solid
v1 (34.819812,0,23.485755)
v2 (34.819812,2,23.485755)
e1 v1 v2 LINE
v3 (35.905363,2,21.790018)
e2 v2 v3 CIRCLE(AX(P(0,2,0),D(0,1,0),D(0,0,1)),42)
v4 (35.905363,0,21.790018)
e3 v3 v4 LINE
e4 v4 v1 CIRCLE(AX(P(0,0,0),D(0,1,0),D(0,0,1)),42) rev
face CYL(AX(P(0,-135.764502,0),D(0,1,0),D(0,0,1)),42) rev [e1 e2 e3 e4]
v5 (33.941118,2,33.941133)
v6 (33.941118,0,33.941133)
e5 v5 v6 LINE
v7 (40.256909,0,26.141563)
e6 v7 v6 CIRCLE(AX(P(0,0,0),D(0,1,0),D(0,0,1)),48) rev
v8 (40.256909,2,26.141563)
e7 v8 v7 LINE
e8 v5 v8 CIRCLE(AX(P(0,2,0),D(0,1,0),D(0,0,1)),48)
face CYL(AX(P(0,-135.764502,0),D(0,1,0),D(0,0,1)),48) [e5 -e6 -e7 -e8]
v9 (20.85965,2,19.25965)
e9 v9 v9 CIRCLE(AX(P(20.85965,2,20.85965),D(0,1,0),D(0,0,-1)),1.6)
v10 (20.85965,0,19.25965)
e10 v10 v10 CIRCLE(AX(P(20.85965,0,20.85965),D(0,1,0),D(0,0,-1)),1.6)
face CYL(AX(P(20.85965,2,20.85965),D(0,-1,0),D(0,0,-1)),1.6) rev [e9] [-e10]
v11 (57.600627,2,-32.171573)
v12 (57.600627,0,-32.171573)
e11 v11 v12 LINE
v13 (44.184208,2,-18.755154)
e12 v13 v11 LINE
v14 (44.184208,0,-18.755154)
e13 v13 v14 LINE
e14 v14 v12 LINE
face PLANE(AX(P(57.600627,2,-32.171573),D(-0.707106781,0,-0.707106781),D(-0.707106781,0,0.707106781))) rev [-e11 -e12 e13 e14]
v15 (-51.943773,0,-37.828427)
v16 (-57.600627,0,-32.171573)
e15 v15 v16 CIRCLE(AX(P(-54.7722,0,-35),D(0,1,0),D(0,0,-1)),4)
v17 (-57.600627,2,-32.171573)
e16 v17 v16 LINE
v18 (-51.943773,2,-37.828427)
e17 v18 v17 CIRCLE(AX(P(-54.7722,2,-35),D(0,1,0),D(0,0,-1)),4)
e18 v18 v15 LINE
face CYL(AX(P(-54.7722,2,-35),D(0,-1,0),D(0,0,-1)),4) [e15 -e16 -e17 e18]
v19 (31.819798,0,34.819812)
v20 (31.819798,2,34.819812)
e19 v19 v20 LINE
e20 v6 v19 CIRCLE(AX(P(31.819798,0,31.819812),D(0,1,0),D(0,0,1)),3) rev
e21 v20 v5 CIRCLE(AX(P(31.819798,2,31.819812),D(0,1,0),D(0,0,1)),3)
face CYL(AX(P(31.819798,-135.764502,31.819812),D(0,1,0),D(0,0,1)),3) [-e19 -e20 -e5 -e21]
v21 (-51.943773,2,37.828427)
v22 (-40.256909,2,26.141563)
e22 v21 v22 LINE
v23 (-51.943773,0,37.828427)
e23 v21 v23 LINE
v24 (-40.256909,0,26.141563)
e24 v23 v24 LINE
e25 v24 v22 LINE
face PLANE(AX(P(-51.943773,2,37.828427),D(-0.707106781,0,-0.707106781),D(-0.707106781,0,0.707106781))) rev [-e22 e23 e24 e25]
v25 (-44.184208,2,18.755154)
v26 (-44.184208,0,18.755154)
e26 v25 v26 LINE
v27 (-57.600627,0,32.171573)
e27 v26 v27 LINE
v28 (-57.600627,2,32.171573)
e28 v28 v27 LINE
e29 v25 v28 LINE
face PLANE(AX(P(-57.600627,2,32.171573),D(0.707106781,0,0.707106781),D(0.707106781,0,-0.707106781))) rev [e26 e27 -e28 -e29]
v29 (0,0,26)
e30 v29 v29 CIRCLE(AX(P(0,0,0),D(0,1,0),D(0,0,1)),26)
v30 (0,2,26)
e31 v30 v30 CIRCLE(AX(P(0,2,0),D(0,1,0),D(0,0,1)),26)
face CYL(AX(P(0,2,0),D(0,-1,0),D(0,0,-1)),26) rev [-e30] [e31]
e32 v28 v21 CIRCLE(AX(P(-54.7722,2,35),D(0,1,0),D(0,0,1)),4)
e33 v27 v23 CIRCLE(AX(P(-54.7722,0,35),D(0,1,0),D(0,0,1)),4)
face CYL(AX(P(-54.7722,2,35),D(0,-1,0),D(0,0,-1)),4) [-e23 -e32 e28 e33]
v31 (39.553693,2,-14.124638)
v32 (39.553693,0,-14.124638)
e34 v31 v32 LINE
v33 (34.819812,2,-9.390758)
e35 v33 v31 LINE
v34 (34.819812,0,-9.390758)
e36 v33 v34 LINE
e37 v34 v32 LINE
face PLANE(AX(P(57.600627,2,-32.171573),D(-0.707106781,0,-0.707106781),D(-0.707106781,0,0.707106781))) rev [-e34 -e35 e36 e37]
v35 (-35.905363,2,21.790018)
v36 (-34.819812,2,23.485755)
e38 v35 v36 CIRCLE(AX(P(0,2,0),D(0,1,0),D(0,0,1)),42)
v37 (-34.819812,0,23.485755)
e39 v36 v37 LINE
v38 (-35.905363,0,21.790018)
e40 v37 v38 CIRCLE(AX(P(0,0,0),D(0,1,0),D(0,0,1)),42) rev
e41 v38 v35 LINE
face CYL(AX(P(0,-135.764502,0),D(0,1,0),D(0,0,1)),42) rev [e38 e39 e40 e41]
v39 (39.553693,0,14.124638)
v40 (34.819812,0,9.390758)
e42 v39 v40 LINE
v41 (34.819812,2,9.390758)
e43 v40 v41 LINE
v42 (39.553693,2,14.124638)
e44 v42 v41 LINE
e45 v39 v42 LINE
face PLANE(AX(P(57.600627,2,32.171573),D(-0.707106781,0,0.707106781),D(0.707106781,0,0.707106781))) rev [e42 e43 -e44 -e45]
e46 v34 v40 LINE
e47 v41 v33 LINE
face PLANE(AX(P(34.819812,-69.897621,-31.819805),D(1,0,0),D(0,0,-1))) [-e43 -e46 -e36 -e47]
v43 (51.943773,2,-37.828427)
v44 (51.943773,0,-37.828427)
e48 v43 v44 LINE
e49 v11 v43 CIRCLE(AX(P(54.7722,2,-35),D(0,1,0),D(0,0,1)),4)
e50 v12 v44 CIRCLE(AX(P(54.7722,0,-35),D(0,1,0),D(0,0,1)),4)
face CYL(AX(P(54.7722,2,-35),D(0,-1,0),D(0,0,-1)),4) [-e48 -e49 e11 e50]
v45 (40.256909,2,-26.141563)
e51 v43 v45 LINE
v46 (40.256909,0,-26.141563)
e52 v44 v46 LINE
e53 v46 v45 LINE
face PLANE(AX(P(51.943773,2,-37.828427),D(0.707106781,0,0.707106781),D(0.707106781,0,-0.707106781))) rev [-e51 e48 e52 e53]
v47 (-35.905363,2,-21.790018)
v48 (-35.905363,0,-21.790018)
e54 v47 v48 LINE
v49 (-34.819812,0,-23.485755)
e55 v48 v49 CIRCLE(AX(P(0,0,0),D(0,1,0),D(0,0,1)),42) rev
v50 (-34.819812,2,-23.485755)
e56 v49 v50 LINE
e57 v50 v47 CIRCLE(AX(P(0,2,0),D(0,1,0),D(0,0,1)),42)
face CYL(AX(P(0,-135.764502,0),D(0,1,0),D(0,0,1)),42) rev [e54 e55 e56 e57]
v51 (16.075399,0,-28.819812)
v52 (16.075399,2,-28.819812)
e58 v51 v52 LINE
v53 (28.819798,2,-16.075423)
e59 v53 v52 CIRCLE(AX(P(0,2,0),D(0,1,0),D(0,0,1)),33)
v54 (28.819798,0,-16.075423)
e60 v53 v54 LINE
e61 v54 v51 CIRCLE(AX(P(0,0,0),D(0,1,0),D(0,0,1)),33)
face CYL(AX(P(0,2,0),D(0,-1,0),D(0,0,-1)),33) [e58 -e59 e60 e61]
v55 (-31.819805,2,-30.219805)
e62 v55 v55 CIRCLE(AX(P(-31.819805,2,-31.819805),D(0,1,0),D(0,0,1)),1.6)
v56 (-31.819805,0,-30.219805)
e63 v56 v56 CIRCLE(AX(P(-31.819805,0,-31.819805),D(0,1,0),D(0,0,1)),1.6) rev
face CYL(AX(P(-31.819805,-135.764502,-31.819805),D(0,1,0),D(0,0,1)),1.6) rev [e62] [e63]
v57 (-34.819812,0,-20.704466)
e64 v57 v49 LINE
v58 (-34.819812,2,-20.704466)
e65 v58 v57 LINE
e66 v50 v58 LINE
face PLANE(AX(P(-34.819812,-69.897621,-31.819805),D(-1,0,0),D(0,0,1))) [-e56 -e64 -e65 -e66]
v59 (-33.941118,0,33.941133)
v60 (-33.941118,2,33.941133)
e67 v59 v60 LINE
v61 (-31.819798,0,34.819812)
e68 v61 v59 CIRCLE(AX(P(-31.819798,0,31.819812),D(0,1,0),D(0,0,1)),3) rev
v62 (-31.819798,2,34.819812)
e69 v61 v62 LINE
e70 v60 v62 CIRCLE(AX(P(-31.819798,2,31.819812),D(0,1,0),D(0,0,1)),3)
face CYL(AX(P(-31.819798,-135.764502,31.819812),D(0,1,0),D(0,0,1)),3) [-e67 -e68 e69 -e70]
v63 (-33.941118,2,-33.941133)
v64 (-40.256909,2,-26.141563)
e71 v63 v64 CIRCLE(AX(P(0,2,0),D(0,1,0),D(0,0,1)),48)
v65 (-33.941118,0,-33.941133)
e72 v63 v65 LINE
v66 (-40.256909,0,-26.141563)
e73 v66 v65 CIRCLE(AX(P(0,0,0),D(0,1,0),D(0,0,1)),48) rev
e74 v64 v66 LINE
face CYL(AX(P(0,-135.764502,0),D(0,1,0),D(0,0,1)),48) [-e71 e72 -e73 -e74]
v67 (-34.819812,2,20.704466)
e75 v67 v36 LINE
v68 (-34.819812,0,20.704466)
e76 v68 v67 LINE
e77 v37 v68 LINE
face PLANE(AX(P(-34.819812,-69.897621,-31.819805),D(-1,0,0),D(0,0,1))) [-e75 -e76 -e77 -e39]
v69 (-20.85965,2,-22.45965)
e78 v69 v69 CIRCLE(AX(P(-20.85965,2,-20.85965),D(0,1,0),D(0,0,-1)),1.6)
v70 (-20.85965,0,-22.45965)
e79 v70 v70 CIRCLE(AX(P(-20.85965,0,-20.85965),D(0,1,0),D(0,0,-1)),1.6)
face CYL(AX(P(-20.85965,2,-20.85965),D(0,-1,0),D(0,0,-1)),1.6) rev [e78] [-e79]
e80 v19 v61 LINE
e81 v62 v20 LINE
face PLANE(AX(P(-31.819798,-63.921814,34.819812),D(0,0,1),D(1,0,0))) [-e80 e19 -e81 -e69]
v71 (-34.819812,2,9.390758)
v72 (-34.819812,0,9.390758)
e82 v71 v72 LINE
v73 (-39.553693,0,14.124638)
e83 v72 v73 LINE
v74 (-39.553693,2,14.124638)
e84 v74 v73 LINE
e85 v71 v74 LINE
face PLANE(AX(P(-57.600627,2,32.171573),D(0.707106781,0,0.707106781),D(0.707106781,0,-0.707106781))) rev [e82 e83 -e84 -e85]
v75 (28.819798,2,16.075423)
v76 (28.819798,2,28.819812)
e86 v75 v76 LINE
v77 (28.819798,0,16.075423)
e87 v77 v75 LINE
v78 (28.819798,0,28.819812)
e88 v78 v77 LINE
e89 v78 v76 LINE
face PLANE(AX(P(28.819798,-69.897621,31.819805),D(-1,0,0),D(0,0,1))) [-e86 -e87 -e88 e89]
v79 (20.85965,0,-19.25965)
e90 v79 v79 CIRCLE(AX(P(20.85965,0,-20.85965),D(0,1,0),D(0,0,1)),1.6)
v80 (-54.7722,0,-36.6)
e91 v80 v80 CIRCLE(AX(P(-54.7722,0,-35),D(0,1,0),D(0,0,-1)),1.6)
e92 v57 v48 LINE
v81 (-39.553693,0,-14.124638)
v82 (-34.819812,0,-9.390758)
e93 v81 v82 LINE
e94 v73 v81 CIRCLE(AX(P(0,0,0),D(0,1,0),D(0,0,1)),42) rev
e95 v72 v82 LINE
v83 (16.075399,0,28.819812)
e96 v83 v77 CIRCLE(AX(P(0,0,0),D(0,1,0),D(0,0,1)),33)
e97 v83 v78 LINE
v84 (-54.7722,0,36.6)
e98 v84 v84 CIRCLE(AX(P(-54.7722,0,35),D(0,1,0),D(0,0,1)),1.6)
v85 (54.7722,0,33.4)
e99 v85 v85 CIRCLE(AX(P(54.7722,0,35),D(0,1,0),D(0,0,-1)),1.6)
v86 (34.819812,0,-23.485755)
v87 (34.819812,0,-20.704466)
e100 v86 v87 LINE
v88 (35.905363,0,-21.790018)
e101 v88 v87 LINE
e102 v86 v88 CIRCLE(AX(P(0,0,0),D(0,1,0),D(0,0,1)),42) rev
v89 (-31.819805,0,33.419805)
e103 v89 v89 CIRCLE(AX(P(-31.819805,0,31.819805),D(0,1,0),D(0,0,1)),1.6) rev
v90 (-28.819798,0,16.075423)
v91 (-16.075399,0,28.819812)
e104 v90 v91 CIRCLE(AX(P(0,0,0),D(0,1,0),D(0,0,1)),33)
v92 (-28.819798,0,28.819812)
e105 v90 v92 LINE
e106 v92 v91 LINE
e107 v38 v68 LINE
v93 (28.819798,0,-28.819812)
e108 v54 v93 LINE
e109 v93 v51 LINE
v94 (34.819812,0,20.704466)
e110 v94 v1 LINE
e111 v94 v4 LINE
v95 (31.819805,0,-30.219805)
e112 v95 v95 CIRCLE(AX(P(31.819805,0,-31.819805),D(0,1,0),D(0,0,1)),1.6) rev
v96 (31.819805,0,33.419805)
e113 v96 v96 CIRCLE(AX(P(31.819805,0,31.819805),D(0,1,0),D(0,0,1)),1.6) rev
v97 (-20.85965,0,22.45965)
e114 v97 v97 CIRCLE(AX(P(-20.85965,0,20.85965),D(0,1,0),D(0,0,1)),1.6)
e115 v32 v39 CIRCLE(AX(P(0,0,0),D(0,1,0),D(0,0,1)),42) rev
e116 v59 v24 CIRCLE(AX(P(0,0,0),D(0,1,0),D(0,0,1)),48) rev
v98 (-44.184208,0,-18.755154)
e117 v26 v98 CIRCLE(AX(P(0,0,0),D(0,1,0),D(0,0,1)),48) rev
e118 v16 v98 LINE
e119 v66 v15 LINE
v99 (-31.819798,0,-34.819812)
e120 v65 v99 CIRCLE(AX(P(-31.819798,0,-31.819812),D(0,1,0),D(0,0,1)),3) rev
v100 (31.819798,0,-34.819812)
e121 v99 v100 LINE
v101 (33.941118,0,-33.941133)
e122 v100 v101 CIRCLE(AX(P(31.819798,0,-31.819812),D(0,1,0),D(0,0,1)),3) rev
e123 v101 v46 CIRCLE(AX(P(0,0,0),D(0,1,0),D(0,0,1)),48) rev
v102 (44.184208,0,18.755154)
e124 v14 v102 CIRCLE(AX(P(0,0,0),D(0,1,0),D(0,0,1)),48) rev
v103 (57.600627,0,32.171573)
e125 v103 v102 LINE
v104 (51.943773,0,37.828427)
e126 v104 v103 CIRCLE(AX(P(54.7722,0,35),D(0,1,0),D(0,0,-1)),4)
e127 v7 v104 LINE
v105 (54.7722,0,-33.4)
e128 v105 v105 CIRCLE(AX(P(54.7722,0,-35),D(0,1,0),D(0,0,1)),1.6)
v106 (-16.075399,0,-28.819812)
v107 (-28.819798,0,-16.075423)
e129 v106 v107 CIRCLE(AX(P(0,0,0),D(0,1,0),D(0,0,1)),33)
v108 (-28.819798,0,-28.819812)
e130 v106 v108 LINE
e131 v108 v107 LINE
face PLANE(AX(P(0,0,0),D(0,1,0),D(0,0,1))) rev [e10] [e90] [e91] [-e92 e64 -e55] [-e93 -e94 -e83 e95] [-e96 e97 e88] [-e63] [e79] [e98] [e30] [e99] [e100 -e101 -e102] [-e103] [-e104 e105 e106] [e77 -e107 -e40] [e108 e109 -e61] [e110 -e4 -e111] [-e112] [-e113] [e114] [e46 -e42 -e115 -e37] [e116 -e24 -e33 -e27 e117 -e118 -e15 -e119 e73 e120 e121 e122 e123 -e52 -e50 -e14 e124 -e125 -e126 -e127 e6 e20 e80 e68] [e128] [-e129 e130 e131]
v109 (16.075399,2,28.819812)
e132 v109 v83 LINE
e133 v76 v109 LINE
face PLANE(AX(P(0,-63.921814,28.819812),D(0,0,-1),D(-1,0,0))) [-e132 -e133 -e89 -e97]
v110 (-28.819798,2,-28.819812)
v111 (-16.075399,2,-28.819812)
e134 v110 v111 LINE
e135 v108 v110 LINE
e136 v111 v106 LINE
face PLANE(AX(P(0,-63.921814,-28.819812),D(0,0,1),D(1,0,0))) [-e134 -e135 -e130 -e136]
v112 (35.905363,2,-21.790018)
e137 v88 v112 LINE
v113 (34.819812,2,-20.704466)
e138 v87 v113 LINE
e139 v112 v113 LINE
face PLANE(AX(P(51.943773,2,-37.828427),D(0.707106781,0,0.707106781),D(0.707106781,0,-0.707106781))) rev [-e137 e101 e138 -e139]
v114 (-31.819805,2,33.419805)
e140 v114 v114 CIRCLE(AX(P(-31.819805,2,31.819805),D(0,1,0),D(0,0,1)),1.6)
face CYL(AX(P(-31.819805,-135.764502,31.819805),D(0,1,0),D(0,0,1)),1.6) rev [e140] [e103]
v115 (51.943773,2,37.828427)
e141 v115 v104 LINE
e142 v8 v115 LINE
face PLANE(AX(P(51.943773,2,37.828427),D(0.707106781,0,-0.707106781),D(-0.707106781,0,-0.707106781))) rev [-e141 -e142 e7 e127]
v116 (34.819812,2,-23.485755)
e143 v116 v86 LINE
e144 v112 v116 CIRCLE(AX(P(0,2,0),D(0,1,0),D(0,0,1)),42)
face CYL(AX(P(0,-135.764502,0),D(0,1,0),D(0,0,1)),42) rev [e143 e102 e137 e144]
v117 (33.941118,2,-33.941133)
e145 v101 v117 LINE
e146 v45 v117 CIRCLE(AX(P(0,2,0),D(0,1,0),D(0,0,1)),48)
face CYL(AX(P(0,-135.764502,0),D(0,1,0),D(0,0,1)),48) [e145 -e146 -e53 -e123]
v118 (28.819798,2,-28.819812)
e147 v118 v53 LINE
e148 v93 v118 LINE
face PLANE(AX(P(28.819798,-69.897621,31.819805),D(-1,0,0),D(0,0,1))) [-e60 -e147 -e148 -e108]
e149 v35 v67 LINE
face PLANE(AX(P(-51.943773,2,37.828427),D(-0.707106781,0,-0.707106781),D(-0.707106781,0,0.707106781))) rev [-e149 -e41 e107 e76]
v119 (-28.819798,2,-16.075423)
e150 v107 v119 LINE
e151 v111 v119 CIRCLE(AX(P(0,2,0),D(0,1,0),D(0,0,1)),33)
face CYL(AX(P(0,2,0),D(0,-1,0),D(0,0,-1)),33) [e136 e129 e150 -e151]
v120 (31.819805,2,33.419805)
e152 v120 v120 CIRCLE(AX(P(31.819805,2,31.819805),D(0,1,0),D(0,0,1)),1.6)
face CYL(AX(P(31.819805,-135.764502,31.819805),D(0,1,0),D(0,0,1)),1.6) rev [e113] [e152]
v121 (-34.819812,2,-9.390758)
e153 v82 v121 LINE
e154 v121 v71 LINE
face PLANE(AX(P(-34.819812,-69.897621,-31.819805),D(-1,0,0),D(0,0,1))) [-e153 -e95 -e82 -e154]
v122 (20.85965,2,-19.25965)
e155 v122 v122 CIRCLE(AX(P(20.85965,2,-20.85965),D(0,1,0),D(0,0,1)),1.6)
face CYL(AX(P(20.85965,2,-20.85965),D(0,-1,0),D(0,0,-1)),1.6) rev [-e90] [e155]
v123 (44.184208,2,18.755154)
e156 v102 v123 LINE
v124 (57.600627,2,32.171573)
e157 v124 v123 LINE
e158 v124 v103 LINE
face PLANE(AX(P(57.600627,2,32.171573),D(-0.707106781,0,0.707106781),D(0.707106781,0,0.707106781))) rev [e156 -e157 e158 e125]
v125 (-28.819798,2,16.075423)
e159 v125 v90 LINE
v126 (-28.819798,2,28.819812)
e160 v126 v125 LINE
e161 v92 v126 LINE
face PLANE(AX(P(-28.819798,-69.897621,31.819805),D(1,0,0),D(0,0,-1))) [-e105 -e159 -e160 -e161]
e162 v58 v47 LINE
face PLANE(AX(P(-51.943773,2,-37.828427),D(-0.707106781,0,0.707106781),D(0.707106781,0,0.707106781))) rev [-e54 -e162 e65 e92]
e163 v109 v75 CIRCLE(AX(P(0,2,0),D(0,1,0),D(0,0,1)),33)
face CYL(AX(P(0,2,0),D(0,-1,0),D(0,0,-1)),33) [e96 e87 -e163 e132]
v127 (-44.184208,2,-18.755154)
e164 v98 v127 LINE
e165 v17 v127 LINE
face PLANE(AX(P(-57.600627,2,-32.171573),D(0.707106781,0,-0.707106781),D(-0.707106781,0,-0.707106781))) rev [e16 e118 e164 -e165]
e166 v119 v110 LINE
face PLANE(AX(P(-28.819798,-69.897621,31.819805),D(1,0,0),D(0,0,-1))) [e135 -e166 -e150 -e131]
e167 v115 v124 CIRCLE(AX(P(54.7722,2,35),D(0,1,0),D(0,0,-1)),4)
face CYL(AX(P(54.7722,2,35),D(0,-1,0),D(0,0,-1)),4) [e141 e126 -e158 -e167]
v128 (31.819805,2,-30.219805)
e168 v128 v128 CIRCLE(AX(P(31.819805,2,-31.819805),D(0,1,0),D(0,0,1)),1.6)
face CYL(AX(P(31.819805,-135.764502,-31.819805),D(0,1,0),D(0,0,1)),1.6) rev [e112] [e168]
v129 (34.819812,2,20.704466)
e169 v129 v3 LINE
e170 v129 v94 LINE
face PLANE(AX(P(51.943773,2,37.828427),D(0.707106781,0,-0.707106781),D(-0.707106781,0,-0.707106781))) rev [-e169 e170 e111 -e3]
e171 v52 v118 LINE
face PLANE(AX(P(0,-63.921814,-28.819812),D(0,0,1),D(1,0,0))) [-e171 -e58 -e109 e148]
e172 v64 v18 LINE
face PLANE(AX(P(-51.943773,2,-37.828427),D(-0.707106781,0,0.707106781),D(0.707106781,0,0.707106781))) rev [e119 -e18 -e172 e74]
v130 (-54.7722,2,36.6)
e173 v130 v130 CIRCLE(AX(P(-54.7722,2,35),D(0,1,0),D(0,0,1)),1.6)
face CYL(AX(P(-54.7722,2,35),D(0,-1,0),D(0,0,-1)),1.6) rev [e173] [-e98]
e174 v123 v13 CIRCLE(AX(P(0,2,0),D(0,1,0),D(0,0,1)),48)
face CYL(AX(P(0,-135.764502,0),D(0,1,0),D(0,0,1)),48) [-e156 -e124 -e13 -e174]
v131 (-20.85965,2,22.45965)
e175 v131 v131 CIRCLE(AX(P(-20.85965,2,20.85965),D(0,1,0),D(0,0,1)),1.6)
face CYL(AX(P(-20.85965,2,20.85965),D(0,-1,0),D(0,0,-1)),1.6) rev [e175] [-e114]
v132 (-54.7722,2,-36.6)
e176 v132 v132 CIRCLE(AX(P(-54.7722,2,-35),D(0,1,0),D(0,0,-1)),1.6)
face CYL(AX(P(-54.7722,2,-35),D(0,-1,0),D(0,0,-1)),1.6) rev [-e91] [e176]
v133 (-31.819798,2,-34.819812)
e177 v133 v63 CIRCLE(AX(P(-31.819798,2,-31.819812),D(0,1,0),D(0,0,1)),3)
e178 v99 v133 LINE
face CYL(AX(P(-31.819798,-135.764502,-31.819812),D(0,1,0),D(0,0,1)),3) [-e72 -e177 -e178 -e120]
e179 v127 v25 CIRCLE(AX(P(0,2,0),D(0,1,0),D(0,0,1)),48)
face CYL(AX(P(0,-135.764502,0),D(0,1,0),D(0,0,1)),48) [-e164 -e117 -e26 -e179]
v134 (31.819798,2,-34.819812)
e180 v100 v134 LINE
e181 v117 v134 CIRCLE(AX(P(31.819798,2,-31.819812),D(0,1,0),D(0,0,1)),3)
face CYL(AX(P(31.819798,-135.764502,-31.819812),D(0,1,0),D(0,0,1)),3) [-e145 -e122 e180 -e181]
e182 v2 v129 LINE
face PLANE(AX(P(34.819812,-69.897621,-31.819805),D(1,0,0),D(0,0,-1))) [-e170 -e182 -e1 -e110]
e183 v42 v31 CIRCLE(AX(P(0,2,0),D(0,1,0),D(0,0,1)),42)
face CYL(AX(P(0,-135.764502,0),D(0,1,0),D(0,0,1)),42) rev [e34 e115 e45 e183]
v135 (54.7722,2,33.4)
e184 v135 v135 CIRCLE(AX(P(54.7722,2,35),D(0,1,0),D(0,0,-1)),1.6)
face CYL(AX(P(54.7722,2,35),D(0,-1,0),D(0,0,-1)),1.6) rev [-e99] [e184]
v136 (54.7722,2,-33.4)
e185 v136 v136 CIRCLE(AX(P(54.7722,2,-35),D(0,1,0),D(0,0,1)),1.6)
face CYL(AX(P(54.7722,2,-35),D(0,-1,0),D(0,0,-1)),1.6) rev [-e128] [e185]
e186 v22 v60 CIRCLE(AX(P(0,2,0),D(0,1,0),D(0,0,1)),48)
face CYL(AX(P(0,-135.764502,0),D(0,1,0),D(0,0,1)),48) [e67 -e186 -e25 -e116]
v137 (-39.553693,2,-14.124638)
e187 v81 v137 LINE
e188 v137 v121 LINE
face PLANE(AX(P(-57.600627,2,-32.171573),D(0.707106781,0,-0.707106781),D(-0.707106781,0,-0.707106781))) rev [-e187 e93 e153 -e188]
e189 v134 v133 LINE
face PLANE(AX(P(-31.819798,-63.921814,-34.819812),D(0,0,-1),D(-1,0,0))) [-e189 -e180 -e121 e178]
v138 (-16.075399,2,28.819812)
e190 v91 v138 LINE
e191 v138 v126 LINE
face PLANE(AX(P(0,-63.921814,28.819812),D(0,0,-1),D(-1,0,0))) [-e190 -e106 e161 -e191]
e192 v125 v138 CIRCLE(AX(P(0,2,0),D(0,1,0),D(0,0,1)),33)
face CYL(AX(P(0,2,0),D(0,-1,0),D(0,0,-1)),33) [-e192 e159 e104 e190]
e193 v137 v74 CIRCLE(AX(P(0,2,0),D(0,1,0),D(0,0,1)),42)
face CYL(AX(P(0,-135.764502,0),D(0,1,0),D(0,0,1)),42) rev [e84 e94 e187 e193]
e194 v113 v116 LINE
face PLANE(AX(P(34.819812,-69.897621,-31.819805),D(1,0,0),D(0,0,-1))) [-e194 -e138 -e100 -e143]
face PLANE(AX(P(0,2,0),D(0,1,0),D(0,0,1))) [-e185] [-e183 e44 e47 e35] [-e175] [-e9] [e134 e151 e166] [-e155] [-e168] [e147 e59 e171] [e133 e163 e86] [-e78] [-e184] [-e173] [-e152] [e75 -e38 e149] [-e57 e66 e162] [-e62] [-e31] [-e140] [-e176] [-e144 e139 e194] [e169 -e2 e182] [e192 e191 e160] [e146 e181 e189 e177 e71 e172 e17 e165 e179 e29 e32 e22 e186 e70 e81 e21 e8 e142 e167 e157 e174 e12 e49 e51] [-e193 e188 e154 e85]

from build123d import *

# Parameters (mm, degrees)
SKETCH1_R           = 1.6
BOSS_EXTRUDE1_DEPTH = 2
SKETCH2_R           = 48
SKETCH2_R_2         = 42
SKETCH2_R_3         = 1.6
BOSS_EXTRUDE2_DEPTH = 2
SKETCH3_R           = 1.6
BOSS_EXTRUDE3_DEPTH = 2
CUT_EXTRUDE1_DEPTH  = 10
FILLET1_R           = 3
BOSS_EXTRUDE4_DEPTH = 2
CUT_EXTRUDE2_START  = -10
SKETCH6_R           = 26
CUT_EXTRUDE2_DEPTH  = 10


with BuildPart() as part:
    # Sketch1 → Boss-Extrude1 (new body)
    with BuildSketch(Plane(origin=(0, 0, 0), x_dir=(1, 0, 0), z_dir=(0, 1, 0))):
        with BuildLine():
            Line((-51.943772875, 37.828427125), (-29.299283734, 15.183937983))
            ThreePointArc((-29.299283734, 15.183937983), (0, 33), (29.299283734, 15.183937983))
            Line((29.299283734, 15.183937983), (51.943772875, 37.828427125))
            ThreePointArc((51.943772875, 37.828427125), (57.600627125, 37.828427125), (57.600627125, 32.171572875))
            Line((57.600627125, 32.171572875), (32.280845123, 6.851790873))
            ThreePointArc((32.280845123, 6.851790873), (33, 0), (32.280845123, -6.851790873))
            Line((32.280845123, -6.851790873), (57.600627125, -32.171572875))
            ThreePointArc((57.600627125, -32.171572875), (57.600627125, -37.828427125), (51.943772875, -37.828427125))
            Line((51.943772875, -37.828427125), (29.299283734, -15.183937983))
            ThreePointArc((29.299283734, -15.183937983), (0, -33), (-29.299283734, -15.183937983))
            Line((-29.299283734, -15.183937983), (-51.943772875, -37.828427125))
            ThreePointArc((-51.943772875, -37.828427125), (-57.600627125, -37.828427125), (-57.600627125, -32.171572875))
            Line((-57.600627125, -32.171572875), (-32.280845123, -6.851790873))
            ThreePointArc((-32.280845123, -6.851790873), (-33, 0), (-32.280845123, 6.851790873))
            Line((-32.280845123, 6.851790873), (-57.600627125, 32.171572875))
            ThreePointArc((-57.600627125, 32.171572875), (-57.600627125, 37.828427125), (-51.943772875, 37.828427125))
        make_face()
        with Locations(Location((54.7722, 35, 0), (0, 0, 270))):
            Circle(SKETCH1_R, mode=Mode.SUBTRACT)
        with Locations(Location((-54.7722, 35, 0), (0, 0, 90))):
            Circle(SKETCH1_R, mode=Mode.SUBTRACT)
        with Locations(Location((54.7722, -35, 0), (0, 0, 90))):
            Circle(SKETCH1_R, mode=Mode.SUBTRACT)
        with Locations(Location((-54.7722, -35, 0), (0, 0, 270))):
            Circle(SKETCH1_R, mode=Mode.SUBTRACT)
        with Locations(Location((20.859650045, 20.859650045, 0), (0, 0, 270))):
            Circle(SKETCH1_R, mode=Mode.SUBTRACT)
        with Locations(Location((-20.859650045, 20.859650045, 0), (0, 0, 90))):
            Circle(SKETCH1_R, mode=Mode.SUBTRACT)
        with Locations(Location((20.859650045, -20.859650045, 0), (0, 0, 90))):
            Circle(SKETCH1_R, mode=Mode.SUBTRACT)
        with Locations(Location((-20.859650045, -20.859650045, 0), (0, 0, 270))):
            Circle(SKETCH1_R, mode=Mode.SUBTRACT)
        with BuildLine():
            Line((0, 4.242640687), (-16.140662024, 20.383302711))
            ThreePointArc((-16.140662024, 20.383302711), (0, 26), (16.140662024, 20.383302711))
            Line((16.140662024, 20.383302711), (0, 4.242640687))
        make_face(mode=Mode.SUBTRACT)
        with BuildLine():
            Line((0, -4.242640687), (-16.140662024, -20.383302711))
            ThreePointArc((-16.140662024, -20.383302711), (0, -26), (16.140662024, -20.383302711))
            Line((16.140662024, -20.383302711), (0, -4.242640687))
        make_face(mode=Mode.SUBTRACT)
        with BuildLine():
            Line((4.242640687, 0), (20.383302711, -16.140662024))
            ThreePointArc((20.383302711, -16.140662024), (26, 0), (20.383302711, 16.140662024))
            Line((20.383302711, 16.140662024), (4.242640687, 0))
        make_face(mode=Mode.SUBTRACT)
        with BuildLine():
            Line((-4.242640687, 0), (-20.383302711, -16.140662024))
            ThreePointArc((-20.383302711, -16.140662024), (-26, 0), (-20.383302711, 16.140662024))
            Line((-20.383302711, 16.140662024), (-4.242640687, 0))
        make_face(mode=Mode.SUBTRACT)
    extrude(amount=BOSS_EXTRUDE1_DEPTH)

    # Sketch2 → Boss-Extrude2 (add)
    with BuildSketch(Plane(origin=(0, 2, 0), x_dir=(1, 0, 0), z_dir=(0, 1, 0))):
        Circle(SKETCH2_R)
        Circle(SKETCH2_R_2, mode=Mode.SUBTRACT)
        with Locations(Location((31.819805153, 31.819805153, 0), (0, 0, 270))):
            Circle(SKETCH2_R_3, mode=Mode.SUBTRACT)
        with Locations(Location((-31.819805153, 31.819805153, 0), (0, 0, 270))):
            Circle(SKETCH2_R_3, mode=Mode.SUBTRACT)
        with Locations(Location((31.819805153, -31.819805153, 0), (0, 0, 270))):
            Circle(SKETCH2_R_3, mode=Mode.SUBTRACT)
        with Locations(Location((-31.819805153, -31.819805153, 0), (0, 0, 270))):
            Circle(SKETCH2_R_3, mode=Mode.SUBTRACT)
    extrude(amount=-BOSS_EXTRUDE2_DEPTH)

    # Sketch3 → Boss-Extrude3 (add)
    # profile 1 of 2: a face of its own
    with BuildSketch(Plane(origin=(0, 2, 0), x_dir=(1, 0, 0), z_dir=(0, 1, 0))):
        with BuildLine():
            Line((34.819811892, 31.819805153), (34.819811892, -31.819805153))
            ThreePointArc((34.819811892, -31.819805153), (31.819805153, -34.819811892), (28.819798415, -31.819805153))
            Line((28.819798415, -31.819805153), (28.819798415, 31.819805153))
            ThreePointArc((28.819798415, 31.819805153), (31.819805153, 34.819811892), (34.819811892, 31.819805153))
        make_face()
        with Locations(Location((31.819805153, -31.819805153, 0), (0, 0, 270))):
            Circle(SKETCH3_R, mode=Mode.SUBTRACT)
        with Locations(Location((31.819805153, 31.819805153, 0), (0, 0, 270))):
            Circle(SKETCH3_R, mode=Mode.SUBTRACT)
    # profile 2 of 2: a face of its own
    with BuildSketch(Plane(origin=(0, 2, 0), x_dir=(1, 0, 0), z_dir=(0, 1, 0))):
        with BuildLine():
            Line((-28.819798415, -31.819805153), (-28.819798415, 31.819805153))
            ThreePointArc((-28.819798415, 31.819805153), (-31.819805153, 34.819811892), (-34.819811892, 31.819805153))
            Line((-34.819811892, 31.819805153), (-34.819811892, -31.819805153))
            ThreePointArc((-34.819811892, -31.819805153), (-31.819805153, -34.819811892), (-28.819798415, -31.819805153))
        make_face()
        with Locations(Location((-31.819805153, 31.819805153, 0), (0, 0, 270))):
            Circle(SKETCH3_R, mode=Mode.SUBTRACT)
        with Locations(Location((-31.819805153, -31.819805153, 0), (0, 0, 270))):
            Circle(SKETCH3_R, mode=Mode.SUBTRACT)
    extrude(amount=-BOSS_EXTRUDE3_DEPTH)

    # Sketch4 → Cut-Extrude1 (cut)
    with BuildSketch(Plane(origin=(0, 2, 0), x_dir=(1, 0, 0), z_dir=(0, 1, 0))):
        Polygon((-28.819805153, 31.819805153), (-28.819805153, 24.740165209), (0, 38.846192425), (28.819805153, 24.740165209), (28.819805153, 31.819805153), (28.819805153, 53.488724091), (-28.819805153, 53.488724091), align=None)
        Polygon((28.819805153, -31.819805153), (28.819805153, -27.443703625), (0, -37.592318486), (-28.819805153, -27.443703625), (-28.819805153, -31.819805153), (-28.819805153, -57.678243433), (28.819805153, -57.678243433), align=None)
    extrude(amount=-CUT_EXTRUDE1_DEPTH, mode=Mode.SUBTRACT)

    # Fillet1
    # the kernel refuses this fillet: 3 mm, written as the material it takes off along each edge
    with BuildSketch(Plane(origin=(-28.819805153, -16.95161691, -38.385138152), x_dir=(0, 0, 1), z_dir=(0, 1, 0)), Plane(origin=(28.819805153, -16.95161691, 38.385138152), x_dir=(0, 0, -1), z_dir=(0, 1, 0))) as fillet1_piece_1:
        with BuildLine():
            CenterArc((6.565332998, -3), FILLET1_R, 90, 135)
            ThreePointArc((4.444012655, -5.121320344), (2.131461319, -2.639230371), (0, 0))
            Line((0, 0), (6.565332998, 0))
        make_face()
    extrude(amount=35.903233819, mode=Mode.SUBTRACT)
    with BuildSketch(Plane(origin=(-28.819805153, -16.95161691, 38.385138152), x_dir=(-0.755284934005079, 0, -0.6553965734308833), z_dir=(0, 1, 0)), Plane(origin=(28.819805153, -16.95161691, -38.385138152), x_dir=(0.7552849340050823, 0, 0.6553965734308795), z_dir=(0, 1, 0))) as fillet1_piece_2:
        with BuildLine():
            CenterArc((6.568751552, -2.99250738), FILLET1_R, 85.949727095, 135)
            Line((4.30289675, -4.9586971), (0, 0))
            ThreePointArc((0, 0), (3.390323382, 0.11988192), (6.780646764, 0))
        make_face()
    extrude(amount=35.903233819, mode=Mode.SUBTRACT)


with BuildPart() as boss_extrude4_tool:
    # Sketch5 → Boss-Extrude4 (new body)
    with BuildSketch(Plane(origin=(0, 2, 0), x_dir=(1, 0, 0), z_dir=(0, 1, 0))):
        Polygon((-31.819798415, 34.819811892), (31.819798415, 34.819811892), (29.753362448, 32.753375926), (28.819798415, 31.819811892), (28.819798415, 28.819811892), (0, 28.819811892), (-28.819798415, 28.819811892), (-28.819798415, 31.819811892), align=None)
        Polygon((-28.819798415, -31.819811892), (-31.819798415, -34.819811892), (31.819798415, -34.819811892), (29.753362448, -32.753375926), (28.819798415, -31.819811892), (28.819798415, -28.819811892), (0, -28.819811892), (-28.819798415, -28.819811892), align=None)
    extrude(amount=-BOSS_EXTRUDE4_DEPTH)


with BuildPart() as part_1:
    add(part.part)


with BuildPart() as part_2:
    # Boss-Extrude4: joined with boss_extrude4_tool
    add(part_1.part.fuse(boss_extrude4_tool.part, tol=0.00001))

    # Sketch6 → Cut-Extrude2 (cut)
    with BuildSketch(Plane(origin=(0, 2, 0), x_dir=(1, 0, 0), z_dir=(0, 1, 0)).offset(CUT_EXTRUDE2_START)):
        with Locations(Location((0, 0, 0), (0, 0, 270))):
            Circle(SKETCH6_R)
    extrude(amount=CUT_EXTRUDE2_DEPTH, mode=Mode.SUBTRACT)


solid = part_2.part
